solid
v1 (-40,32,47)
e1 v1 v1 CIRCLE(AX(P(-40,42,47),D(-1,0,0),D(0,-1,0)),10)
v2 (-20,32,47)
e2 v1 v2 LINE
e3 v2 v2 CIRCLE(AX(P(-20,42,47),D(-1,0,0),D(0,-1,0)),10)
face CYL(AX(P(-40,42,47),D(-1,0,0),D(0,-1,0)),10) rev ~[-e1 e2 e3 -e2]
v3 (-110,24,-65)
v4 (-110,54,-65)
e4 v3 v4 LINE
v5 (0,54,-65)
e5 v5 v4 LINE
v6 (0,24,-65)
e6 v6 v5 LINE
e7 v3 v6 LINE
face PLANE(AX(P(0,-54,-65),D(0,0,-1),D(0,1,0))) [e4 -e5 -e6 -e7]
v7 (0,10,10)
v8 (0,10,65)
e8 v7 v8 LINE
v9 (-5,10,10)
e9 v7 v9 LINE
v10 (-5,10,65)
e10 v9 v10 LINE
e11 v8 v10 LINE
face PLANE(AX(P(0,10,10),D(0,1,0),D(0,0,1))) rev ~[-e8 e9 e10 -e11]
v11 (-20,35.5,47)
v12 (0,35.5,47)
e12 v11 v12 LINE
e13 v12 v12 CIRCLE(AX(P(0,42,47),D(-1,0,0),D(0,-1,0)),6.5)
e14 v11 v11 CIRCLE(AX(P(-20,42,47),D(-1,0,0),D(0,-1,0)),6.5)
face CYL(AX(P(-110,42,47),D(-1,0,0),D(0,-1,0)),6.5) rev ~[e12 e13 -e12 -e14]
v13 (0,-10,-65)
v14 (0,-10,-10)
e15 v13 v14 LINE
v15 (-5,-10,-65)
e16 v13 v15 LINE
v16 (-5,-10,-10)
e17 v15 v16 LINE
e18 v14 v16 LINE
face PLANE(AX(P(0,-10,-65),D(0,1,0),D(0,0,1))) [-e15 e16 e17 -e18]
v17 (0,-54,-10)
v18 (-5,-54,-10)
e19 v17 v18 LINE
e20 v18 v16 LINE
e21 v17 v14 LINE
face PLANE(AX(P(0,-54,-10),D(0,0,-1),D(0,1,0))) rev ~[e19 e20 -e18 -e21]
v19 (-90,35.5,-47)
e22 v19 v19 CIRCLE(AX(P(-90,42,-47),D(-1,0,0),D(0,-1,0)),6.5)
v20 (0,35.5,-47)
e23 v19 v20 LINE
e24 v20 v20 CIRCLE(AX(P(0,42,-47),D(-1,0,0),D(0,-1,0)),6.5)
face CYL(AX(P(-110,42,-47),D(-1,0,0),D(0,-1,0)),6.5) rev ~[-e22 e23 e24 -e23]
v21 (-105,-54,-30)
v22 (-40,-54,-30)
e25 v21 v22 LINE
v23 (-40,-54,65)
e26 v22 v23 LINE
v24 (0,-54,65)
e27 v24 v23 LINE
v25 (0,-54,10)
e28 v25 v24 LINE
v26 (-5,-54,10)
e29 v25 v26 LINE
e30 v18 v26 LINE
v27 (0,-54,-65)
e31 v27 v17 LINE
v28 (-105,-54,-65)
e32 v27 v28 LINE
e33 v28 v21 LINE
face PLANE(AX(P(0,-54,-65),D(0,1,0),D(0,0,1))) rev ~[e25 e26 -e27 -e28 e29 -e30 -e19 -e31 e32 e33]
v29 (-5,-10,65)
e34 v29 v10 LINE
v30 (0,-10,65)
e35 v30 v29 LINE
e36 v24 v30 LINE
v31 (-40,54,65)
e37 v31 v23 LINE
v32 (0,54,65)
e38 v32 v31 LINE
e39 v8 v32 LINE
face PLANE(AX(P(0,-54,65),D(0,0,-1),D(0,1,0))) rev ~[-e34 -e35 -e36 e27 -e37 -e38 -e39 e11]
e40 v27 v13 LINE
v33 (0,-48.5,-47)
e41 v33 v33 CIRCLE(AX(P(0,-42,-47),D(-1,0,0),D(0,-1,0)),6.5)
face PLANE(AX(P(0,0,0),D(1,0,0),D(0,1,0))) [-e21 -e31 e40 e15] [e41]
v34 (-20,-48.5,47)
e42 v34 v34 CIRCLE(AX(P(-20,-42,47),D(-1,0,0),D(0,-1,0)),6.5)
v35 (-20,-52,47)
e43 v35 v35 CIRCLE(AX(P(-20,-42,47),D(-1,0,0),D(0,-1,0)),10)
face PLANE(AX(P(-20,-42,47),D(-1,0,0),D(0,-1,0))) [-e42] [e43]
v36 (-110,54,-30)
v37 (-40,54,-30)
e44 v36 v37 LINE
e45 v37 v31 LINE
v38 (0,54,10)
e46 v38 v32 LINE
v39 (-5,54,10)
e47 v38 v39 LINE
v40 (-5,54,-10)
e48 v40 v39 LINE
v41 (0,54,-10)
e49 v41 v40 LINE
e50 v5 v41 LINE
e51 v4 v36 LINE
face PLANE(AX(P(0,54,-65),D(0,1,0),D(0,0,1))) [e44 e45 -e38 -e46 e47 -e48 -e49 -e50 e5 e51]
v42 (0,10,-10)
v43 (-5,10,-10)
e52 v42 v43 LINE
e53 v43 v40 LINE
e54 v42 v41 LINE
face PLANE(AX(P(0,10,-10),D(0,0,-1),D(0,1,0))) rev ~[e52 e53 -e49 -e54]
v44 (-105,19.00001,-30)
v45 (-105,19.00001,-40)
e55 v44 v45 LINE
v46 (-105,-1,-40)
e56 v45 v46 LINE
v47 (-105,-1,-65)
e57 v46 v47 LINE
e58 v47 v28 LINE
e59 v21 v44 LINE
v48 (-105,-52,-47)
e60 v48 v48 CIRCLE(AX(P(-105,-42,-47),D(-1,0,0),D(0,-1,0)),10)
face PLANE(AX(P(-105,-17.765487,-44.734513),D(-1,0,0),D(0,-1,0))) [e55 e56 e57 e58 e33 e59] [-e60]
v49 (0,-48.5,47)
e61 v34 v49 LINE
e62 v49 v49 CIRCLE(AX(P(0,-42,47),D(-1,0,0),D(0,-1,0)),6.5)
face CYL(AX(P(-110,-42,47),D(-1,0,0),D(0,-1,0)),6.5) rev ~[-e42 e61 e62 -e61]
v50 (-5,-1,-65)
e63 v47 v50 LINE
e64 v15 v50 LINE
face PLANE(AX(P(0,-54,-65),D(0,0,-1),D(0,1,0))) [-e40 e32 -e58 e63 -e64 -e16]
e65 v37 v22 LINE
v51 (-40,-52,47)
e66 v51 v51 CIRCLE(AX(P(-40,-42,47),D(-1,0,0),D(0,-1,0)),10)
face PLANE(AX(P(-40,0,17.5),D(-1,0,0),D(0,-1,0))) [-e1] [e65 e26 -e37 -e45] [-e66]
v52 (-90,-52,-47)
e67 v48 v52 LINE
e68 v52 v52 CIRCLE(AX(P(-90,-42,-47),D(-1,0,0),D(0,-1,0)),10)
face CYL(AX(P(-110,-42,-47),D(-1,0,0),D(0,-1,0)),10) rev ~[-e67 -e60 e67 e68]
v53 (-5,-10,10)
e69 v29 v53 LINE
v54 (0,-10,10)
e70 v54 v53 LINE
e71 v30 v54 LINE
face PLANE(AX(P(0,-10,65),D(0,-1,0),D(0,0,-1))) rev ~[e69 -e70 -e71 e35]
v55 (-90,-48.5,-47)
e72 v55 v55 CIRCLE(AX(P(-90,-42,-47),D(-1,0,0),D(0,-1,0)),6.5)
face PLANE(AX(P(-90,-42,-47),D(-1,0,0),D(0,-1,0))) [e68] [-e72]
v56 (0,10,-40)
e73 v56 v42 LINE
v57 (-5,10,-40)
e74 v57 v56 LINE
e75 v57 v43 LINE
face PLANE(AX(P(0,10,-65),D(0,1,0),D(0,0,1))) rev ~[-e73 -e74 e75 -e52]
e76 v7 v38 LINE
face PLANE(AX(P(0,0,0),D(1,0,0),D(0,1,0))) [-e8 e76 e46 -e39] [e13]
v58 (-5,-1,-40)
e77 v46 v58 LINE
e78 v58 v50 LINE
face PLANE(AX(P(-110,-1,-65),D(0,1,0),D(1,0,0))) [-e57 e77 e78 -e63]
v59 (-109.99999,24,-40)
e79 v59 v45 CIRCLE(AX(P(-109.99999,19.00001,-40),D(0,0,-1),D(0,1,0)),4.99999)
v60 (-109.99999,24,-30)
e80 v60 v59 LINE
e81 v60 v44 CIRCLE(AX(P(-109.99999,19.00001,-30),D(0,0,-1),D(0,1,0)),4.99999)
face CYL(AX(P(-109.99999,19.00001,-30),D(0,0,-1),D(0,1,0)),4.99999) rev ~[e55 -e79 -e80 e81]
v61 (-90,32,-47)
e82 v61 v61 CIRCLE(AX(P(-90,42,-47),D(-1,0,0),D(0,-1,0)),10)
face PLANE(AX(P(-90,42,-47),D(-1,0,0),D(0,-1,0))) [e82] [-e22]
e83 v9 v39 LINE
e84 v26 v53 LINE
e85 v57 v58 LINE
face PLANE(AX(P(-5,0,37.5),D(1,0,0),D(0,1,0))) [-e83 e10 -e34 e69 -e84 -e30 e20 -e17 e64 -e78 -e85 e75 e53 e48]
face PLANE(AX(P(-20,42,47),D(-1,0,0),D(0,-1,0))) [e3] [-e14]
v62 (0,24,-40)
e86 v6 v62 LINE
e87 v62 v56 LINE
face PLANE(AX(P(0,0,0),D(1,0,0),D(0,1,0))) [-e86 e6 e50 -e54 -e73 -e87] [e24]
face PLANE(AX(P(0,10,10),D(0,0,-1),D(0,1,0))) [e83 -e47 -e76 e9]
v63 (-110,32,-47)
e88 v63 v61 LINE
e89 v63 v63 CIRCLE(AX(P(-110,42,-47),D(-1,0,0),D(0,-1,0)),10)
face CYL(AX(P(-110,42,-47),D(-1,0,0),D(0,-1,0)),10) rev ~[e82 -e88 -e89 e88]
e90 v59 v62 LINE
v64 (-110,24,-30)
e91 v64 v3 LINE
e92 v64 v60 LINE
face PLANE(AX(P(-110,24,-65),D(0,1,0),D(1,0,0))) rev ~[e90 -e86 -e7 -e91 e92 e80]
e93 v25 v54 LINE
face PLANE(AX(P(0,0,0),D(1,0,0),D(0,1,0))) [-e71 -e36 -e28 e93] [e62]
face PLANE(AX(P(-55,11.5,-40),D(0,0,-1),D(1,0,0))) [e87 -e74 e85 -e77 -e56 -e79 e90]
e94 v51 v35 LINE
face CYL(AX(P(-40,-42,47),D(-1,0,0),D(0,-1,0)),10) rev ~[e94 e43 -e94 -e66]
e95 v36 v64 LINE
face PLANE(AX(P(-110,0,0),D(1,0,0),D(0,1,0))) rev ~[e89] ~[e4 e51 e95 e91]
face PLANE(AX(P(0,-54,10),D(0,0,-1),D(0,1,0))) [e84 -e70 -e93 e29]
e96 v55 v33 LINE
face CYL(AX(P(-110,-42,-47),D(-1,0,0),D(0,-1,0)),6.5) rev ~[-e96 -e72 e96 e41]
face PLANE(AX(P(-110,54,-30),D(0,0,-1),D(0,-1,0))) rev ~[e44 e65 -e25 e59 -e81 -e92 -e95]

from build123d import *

# Parameters (mm, degrees)
F0_W      = 108
F0_H      = 130
F1_DEPTH  = 110
F2_R      = 6.5
F3_DEPTH  = 110.001
F4_W      = 108
F4_H      = 95
F5_DEPTH  = 70
F6_W      = 110
F6_H      = 25
F7_DEPTH  = 25
F8_R      = 6.5
F9_DEPTH  = 5
F10_R     = 4.99999
F11_R     = 10
F12_DEPTH = 20
F13_R     = 10
F14_DEPTH = 20
F15_W     = 20
F15_H     = 55
F15_W_2   = 44
F15_H_2   = 20
F16_DEPTH = 5


# Not quite as in the source:
# - a fillet or chamfer is up to 0.001 mm smaller than in the source, because OpenCascade refuses the exact size


with BuildPart() as f1:
    # F0 (on Right) → F1 (new body)
    with BuildSketch(Plane.YZ):
        Rectangle(F0_W, F0_H)
    extrude(amount=-F1_DEPTH)

    # F2 (on face) → F3 (cut, through all)
    with BuildSketch(Plane(origin=(-110, 0, 0), x_dir=(0, -1, 0), z_dir=(-1, 0, 0))):
        with Locations((-42, 47)):
            Circle(F2_R)
        with Locations((42, 47)):
            Circle(F2_R)
        with Locations((-42, -47)):
            Circle(F2_R)
        with Locations((42, -47)):
            Circle(F2_R)
    extrude(amount=-F3_DEPTH, mode=Mode.SUBTRACT)

    # F4 (on face) → F5 (cut)
    with BuildSketch(Plane(origin=(-110, 0, 0), x_dir=(0, -1, 0), z_dir=(-1, 0, 0))):
        with Locations((0, 17.5)):
            Rectangle(F4_W, F4_H)
    extrude(amount=-F5_DEPTH, mode=Mode.SUBTRACT)

    # F6 (on face) → F7 (cut)
    with BuildSketch(Plane(origin=(0, 0, -65), x_dir=(1, 0, 0), z_dir=(0, 0, -1))):
        with Locations((-55, -11.5)):
            Rectangle(F6_W, F6_H)
    extrude(amount=-F7_DEPTH, mode=Mode.SUBTRACT)

    # F8 (on face) → F9 (cut)
    with BuildSketch(Plane(origin=(-110, 0, 0), x_dir=(0, -1, 0), z_dir=(-1, 0, 0))):
        Polygon((-24, -30), (-24, -40), (1, -40), (1, -65), (54, -65), (54, -30), align=None)
        with Locations((42, -47)):
            Circle(F8_R, mode=Mode.SUBTRACT)
    extrude(amount=-F9_DEPTH, mode=Mode.SUBTRACT)

    # F10 (radius 5 in the source; OpenCascade refuses exactly that, so slightly less here)
    f10_edges = [f1.edges().sort_by_distance(p)[0] for p in [
        (-105, 24, -35),
    ]]
    fillet(f10_edges, radius=F10_R)

    # F11 (on face) → F12 (cut)
    with BuildSketch(Plane(origin=(-40, 0, 0), x_dir=(0, -1, 0), z_dir=(-1, 0, 0))):
        with Locations((-42, 47)):
            Circle(F11_R)
        with Locations((42, 47)):
            Circle(F11_R)
    extrude(amount=-F12_DEPTH, mode=Mode.SUBTRACT)

    # F13 (on face) → F14 (cut)
    with BuildSketch(Plane(origin=(-110, 0, 0), x_dir=(0, -1, 0), z_dir=(-1, 0, 0))):
        with Locations((-42, -47)):
            Circle(F13_R)
        with Locations((42, -47)):
            Circle(F13_R)
    extrude(amount=-F14_DEPTH, mode=Mode.SUBTRACT)

    # F15 (on face) → F16 (cut)
    with BuildSketch(Plane.YZ):
        with Locations((0, 37.5)):
            Rectangle(F15_W, F15_H)
        with Locations((32, 0)):
            Rectangle(F15_W_2, F15_H_2)
        Rectangle(F15_W, F15_H_2)
        with Locations((-32, 0)):
            Rectangle(F15_W_2, F15_H_2)
        with Locations((0, -37.5)):
            Rectangle(F15_W, F15_H)
    extrude(amount=-F16_DEPTH, mode=Mode.SUBTRACT)


solid = f1.part
